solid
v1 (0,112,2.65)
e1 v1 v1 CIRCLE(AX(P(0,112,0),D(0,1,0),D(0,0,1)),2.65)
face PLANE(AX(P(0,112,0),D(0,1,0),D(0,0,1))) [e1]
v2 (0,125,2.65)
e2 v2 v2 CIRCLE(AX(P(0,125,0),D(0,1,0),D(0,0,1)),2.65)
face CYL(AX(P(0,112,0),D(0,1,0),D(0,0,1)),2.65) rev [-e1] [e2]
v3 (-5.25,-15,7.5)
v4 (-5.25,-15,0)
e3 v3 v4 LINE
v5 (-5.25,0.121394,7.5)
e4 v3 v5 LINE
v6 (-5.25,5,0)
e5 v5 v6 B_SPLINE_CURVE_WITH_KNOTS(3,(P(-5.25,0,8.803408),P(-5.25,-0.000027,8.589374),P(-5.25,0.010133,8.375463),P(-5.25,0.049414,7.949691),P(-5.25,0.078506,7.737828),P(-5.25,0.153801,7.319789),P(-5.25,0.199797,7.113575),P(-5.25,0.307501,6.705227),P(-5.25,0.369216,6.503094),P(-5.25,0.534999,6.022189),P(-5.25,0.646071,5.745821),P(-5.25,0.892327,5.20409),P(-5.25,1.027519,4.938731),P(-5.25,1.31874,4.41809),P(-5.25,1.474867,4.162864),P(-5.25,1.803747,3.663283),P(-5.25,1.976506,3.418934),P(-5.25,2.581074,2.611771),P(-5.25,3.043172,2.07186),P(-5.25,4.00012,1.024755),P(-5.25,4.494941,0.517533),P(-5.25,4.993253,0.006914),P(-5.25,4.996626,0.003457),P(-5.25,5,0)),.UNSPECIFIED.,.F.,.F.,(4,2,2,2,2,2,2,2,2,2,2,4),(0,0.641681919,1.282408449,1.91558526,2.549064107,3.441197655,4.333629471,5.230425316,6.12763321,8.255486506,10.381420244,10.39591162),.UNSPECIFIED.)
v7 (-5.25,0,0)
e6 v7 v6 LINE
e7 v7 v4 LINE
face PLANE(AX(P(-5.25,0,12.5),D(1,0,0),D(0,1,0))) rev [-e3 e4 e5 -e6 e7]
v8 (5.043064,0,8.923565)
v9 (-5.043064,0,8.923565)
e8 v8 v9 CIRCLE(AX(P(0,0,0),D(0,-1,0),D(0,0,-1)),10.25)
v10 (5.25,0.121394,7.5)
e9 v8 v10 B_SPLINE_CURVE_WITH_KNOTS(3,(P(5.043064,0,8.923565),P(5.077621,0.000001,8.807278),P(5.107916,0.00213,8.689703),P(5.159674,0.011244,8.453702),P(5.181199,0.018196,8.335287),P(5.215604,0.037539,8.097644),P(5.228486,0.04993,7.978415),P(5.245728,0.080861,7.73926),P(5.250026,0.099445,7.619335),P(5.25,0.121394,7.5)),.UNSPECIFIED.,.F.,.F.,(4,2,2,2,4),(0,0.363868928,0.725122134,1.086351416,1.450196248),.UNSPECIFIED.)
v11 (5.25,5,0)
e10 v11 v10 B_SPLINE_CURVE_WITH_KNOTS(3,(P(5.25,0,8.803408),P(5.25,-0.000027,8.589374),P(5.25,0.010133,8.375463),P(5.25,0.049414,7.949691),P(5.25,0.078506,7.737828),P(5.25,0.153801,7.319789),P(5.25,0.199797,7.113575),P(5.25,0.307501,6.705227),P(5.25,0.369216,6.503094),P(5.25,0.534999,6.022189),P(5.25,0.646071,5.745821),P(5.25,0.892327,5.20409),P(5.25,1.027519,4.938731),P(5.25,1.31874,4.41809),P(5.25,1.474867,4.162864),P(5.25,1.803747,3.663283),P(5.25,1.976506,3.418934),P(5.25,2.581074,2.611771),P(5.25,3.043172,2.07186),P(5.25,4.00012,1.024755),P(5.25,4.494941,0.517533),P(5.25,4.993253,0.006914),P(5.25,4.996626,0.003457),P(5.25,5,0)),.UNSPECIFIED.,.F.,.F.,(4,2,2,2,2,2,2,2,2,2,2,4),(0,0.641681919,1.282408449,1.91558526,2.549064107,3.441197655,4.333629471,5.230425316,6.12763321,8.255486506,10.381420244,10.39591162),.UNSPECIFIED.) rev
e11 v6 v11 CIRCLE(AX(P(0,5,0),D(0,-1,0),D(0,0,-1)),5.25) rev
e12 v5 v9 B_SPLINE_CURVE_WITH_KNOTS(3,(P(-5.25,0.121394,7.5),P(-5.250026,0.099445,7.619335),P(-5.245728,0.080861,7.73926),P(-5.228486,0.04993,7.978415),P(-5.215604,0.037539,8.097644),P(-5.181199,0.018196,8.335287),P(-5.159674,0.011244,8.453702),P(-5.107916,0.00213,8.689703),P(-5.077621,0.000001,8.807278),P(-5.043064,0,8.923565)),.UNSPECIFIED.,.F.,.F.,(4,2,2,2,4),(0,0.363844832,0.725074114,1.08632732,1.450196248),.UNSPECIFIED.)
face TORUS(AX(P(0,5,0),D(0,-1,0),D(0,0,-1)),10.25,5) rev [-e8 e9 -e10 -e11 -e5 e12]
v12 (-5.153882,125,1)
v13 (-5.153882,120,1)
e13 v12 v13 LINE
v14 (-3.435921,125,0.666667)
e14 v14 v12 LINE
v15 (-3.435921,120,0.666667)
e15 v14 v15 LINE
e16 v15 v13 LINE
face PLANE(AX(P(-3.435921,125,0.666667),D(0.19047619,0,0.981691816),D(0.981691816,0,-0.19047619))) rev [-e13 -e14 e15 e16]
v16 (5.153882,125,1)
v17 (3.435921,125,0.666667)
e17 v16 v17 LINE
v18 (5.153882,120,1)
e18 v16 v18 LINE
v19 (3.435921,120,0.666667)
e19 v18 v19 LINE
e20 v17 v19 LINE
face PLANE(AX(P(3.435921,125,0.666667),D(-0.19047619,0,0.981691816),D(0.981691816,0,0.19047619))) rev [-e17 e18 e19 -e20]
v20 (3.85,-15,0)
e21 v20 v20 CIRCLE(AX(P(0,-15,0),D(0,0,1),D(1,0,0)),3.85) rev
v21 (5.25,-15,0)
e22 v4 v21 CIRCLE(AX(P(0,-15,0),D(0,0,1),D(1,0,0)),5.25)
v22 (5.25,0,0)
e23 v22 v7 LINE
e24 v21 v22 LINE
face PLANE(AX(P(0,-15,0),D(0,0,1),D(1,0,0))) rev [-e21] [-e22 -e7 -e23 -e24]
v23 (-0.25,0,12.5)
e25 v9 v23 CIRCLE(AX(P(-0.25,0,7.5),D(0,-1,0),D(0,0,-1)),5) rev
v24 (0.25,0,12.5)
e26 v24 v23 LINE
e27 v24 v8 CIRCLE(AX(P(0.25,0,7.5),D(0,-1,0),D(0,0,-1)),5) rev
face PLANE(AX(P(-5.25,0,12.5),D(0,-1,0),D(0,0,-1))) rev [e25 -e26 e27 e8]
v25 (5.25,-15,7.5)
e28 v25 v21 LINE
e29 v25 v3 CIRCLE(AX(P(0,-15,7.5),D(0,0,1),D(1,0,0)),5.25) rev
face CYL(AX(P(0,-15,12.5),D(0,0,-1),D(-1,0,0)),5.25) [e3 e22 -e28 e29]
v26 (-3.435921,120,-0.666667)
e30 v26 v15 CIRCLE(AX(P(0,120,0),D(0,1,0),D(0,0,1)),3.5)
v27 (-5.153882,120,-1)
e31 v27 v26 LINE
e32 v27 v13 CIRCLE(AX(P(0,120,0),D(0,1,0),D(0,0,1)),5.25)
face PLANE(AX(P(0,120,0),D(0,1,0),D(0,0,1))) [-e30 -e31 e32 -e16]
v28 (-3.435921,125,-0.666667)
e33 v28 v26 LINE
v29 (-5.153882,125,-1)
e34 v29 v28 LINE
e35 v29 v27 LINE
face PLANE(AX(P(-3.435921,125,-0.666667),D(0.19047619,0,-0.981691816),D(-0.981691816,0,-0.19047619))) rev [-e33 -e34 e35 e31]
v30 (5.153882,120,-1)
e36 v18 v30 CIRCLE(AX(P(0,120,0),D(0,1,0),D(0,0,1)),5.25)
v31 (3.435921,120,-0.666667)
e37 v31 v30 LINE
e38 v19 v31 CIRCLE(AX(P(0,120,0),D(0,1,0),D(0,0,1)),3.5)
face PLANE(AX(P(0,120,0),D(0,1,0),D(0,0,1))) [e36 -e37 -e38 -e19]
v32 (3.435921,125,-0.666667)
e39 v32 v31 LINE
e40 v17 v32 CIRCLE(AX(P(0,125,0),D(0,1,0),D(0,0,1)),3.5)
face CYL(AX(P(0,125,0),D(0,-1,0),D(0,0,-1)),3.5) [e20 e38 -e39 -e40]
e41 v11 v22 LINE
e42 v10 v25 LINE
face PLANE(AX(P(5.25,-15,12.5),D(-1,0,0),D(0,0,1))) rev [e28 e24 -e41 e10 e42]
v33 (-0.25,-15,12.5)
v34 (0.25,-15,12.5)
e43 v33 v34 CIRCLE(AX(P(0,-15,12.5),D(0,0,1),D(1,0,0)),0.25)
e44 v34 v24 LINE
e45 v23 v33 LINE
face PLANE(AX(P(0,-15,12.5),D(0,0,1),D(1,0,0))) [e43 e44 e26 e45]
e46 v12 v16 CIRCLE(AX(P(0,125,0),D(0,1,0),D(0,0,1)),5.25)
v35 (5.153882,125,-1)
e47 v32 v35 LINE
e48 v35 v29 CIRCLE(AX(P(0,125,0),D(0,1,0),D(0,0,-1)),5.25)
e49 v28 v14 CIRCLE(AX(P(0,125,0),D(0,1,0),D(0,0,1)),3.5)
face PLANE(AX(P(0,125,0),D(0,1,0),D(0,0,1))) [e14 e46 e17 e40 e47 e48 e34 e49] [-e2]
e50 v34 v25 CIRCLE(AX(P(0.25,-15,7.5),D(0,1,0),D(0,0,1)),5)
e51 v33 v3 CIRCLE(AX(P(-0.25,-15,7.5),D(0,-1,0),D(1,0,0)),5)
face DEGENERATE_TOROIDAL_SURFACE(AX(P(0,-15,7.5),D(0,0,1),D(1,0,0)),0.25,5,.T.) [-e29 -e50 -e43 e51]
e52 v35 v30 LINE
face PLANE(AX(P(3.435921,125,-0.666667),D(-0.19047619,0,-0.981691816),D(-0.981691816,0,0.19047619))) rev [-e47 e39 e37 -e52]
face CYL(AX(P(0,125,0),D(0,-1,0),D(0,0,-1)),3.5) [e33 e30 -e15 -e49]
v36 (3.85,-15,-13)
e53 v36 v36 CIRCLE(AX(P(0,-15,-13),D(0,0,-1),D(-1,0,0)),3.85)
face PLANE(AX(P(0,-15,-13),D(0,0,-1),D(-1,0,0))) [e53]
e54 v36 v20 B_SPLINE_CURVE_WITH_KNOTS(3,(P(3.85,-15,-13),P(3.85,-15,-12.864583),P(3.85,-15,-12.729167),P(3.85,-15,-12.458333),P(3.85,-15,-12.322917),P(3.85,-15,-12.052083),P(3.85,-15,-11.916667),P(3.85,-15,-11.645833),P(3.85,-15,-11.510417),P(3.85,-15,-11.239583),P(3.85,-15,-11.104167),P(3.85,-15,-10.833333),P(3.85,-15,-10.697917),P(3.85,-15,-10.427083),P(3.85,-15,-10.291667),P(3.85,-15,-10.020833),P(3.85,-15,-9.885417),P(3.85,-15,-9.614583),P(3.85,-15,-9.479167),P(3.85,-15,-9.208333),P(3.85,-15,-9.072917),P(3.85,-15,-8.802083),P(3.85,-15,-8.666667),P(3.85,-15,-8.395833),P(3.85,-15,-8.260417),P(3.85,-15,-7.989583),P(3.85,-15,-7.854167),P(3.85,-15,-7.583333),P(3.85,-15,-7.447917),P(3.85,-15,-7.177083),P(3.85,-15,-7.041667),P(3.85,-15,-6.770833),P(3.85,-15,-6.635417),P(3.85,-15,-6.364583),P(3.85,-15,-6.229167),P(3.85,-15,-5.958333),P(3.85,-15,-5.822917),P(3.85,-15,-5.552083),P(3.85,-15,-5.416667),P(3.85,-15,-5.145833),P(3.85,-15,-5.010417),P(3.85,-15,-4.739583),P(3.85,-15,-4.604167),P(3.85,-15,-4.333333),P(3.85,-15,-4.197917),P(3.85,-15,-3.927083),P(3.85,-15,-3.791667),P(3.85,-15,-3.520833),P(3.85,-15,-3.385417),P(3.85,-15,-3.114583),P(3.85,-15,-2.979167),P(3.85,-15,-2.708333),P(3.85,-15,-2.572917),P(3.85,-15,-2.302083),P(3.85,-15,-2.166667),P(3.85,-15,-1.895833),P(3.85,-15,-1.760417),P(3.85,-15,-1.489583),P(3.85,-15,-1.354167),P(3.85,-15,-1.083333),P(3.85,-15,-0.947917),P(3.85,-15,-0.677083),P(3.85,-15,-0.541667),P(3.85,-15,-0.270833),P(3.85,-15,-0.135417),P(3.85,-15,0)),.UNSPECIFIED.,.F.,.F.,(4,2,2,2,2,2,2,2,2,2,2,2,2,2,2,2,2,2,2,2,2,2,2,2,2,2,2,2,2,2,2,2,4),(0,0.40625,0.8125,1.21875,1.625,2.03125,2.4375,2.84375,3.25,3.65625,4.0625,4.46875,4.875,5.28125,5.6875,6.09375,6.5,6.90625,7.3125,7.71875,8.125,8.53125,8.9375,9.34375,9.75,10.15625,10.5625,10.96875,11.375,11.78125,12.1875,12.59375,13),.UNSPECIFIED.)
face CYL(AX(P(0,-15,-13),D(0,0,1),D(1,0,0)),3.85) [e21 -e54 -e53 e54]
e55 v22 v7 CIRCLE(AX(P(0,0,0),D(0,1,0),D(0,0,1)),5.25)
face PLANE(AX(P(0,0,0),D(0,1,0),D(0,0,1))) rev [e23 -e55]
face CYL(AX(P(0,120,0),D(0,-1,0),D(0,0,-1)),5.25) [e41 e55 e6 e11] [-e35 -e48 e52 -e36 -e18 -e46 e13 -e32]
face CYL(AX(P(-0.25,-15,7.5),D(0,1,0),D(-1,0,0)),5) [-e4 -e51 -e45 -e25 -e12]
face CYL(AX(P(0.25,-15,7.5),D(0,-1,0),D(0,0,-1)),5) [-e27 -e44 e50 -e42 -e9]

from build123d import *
from build123d.topology import SkipClean

# Parameters (mm, degrees)
SKETCH3_R           = 5.25
BOSS_EXTRUDE1_DEPTH = 120
BOSS_EXTRUDE4_DEPTH = 12.5
SKETCH6_R           = 3.85
BOSS_EXTRUDE5_DEPTH = 13
FILLET3_R           = 5
FILLET4_R           = 5
SKETCH7_R           = 2.65
CUT_EXTRUDE1_DEPTH  = 8
BOSS_EXTRUDE6_START = 5
BOSS_EXTRUDE6_DEPTH = 5


with BuildPart() as part:
    # Sketch3 → Boss-Extrude1 (new body)
    with BuildSketch(Plane(origin=(0, 0, 0), x_dir=(1, 0, 0), z_dir=(0, 1, 0))):
        with Locations(Location((0, 0, 0), (0, 0, 270))):
            Circle(SKETCH3_R)
    extrude(amount=BOSS_EXTRUDE1_DEPTH)

    # Sketch4 → Boss-Extrude4 (add)
    with BuildSketch(Plane.XY):
        with BuildLine():
            Line((-5.25, 0), (-5.25, -15))
            ThreePointArc((-5.25, -15), (0, -20.25), (5.25, -15))
            Line((5.25, -15), (5.25, 0))
            Line((5.25, 0), (-5.25, 0))
        make_face()
    extrude(amount=BOSS_EXTRUDE4_DEPTH)

    # Sketch6 → Boss-Extrude5 (add)
    with BuildSketch(Plane(origin=(0, 0, 0), x_dir=(-1, 0, 0), z_dir=(0, 0, -1))):
        with Locations(Location((0, -15, 0), (0, 0, 180))):
            Circle(SKETCH6_R)
    extrude(amount=BOSS_EXTRUDE5_DEPTH)

    # Fillet3
    # the kernel refuses this fillet: 5 mm, written as the material it adds along each edge
    with BuildSketch(Plane(origin=(0, 0, 0), x_dir=(0, 0, 1), z_dir=(-1, 0, 0))) as fillet3_piece_1_section:
        with BuildLine():
            CenterArc((5.25 + FILLET3_R, FILLET3_R), FILLET3_R, 180, 90)
            Line((5.25 + FILLET3_R, 0), (5.25, 0))
            Line((5.25, 0), (5.25, FILLET3_R))
        make_face()
    fillet3_piece_1 = revolve(axis=Axis((0, 0, 0), (0, 1, 0)), revolution_arc=90, mode=Mode.PRIVATE)
    fillet3_piece_1 = split(fillet3_piece_1, bisect_by=Plane(origin=(5.25, 1.168711495, 5.202443702), z_dir=(-1, 0, 0)), keep=Keep.TOP, mode=Mode.PRIVATE)
    add(fillet3_piece_1)
    with BuildSketch(Plane(origin=(0, 0, 0), x_dir=(-1, 0, 0), z_dir=(0, 0, -1))) as fillet3_piece_2_section:
        with BuildLine():
            CenterArc((5.25 + FILLET3_R, FILLET3_R), FILLET3_R, 180, 90)
            Line((5.25 + FILLET3_R, 0), (5.25, 0))
            Line((5.25, 0), (5.25, FILLET3_R))
        make_face()
    fillet3_piece_2 = revolve(axis=Axis((0, 0, 0), (0, 1, 0)), revolution_arc=90, mode=Mode.PRIVATE)
    fillet3_piece_2 = split(fillet3_piece_2, bisect_by=Plane(origin=(-5.25, 1.168711696, 5.202443347), z_dir=(1, 0, 0)), keep=Keep.TOP, mode=Mode.PRIVATE)
    add(fillet3_piece_2)

    # Fillet4
    fillet4_edges = [part.edges().sort_by_distance(p)[0] for p in [
        (5.25, -7.5, 12.5),
        (0, -20.25, 12.5),
        (-5.25, -7.5, 12.5),
    ]]
    fillet(fillet4_edges, radius=FILLET4_R)

    # Sketch7 → Cut-Extrude1 (cut)
    with BuildSketch(Plane(origin=(0, 120, 0), x_dir=(1, 0, 0), z_dir=(0, 1, 0))):
        with Locations(Location((0, 0, 0), (0, 0, 270))):
            Circle(SKETCH7_R)
    extrude(amount=-CUT_EXTRUDE1_DEPTH, mode=Mode.SUBTRACT)

    # Sketch9 → Boss-Extrude6 (add)
    with SkipClean():  # the faces are left unmerged after this step: merging them gives an invalid solid
        with BuildSketch(Plane(origin=(0, 120, 0), x_dir=(1, 0, 0), z_dir=(0, 1, 0)).offset(BOSS_EXTRUDE6_START)):
            with BuildLine():
                Line((-3.435921355, 0.666666667), (-5.153882032, 1))
                ThreePointArc((-5.153882032, 1), (0, 5.25), (5.153882032, 1))
                Line((5.153882032, 1), (3.435921355, 0.666666667))
                ThreePointArc((3.435921355, 0.666666667), (3.5, 0), (3.435921355, -0.666666667))
                Line((3.435921355, -0.666666667), (5.153882032, -1))
                ThreePointArc((5.153882032, -1), (0, -5.25), (-5.153882032, -1))
                Line((-5.153882032, -1), (-3.435921355, -0.666666667))
                ThreePointArc((-3.435921355, -0.666666667), (-3.5, 0), (-3.435921355, 0.666666667))
            make_face()
            with BuildLine():
                ThreePointArc((-2.601483311, 0.504761905), (0, 2.65), (2.601483311, 0.504761905))
                ThreePointArc((2.601483311, 0.504761905), (2.65, 0), (2.601483311, -0.504761905))
                ThreePointArc((2.601483311, -0.504761905), (0, -2.65), (-2.601483311, -0.504761905))
                ThreePointArc((-2.601483311, -0.504761905), (-2.65, 0), (-2.601483311, 0.504761905))
            make_face(mode=Mode.SUBTRACT)
        extrude(amount=-BOSS_EXTRUDE6_DEPTH)


solid = part.part
